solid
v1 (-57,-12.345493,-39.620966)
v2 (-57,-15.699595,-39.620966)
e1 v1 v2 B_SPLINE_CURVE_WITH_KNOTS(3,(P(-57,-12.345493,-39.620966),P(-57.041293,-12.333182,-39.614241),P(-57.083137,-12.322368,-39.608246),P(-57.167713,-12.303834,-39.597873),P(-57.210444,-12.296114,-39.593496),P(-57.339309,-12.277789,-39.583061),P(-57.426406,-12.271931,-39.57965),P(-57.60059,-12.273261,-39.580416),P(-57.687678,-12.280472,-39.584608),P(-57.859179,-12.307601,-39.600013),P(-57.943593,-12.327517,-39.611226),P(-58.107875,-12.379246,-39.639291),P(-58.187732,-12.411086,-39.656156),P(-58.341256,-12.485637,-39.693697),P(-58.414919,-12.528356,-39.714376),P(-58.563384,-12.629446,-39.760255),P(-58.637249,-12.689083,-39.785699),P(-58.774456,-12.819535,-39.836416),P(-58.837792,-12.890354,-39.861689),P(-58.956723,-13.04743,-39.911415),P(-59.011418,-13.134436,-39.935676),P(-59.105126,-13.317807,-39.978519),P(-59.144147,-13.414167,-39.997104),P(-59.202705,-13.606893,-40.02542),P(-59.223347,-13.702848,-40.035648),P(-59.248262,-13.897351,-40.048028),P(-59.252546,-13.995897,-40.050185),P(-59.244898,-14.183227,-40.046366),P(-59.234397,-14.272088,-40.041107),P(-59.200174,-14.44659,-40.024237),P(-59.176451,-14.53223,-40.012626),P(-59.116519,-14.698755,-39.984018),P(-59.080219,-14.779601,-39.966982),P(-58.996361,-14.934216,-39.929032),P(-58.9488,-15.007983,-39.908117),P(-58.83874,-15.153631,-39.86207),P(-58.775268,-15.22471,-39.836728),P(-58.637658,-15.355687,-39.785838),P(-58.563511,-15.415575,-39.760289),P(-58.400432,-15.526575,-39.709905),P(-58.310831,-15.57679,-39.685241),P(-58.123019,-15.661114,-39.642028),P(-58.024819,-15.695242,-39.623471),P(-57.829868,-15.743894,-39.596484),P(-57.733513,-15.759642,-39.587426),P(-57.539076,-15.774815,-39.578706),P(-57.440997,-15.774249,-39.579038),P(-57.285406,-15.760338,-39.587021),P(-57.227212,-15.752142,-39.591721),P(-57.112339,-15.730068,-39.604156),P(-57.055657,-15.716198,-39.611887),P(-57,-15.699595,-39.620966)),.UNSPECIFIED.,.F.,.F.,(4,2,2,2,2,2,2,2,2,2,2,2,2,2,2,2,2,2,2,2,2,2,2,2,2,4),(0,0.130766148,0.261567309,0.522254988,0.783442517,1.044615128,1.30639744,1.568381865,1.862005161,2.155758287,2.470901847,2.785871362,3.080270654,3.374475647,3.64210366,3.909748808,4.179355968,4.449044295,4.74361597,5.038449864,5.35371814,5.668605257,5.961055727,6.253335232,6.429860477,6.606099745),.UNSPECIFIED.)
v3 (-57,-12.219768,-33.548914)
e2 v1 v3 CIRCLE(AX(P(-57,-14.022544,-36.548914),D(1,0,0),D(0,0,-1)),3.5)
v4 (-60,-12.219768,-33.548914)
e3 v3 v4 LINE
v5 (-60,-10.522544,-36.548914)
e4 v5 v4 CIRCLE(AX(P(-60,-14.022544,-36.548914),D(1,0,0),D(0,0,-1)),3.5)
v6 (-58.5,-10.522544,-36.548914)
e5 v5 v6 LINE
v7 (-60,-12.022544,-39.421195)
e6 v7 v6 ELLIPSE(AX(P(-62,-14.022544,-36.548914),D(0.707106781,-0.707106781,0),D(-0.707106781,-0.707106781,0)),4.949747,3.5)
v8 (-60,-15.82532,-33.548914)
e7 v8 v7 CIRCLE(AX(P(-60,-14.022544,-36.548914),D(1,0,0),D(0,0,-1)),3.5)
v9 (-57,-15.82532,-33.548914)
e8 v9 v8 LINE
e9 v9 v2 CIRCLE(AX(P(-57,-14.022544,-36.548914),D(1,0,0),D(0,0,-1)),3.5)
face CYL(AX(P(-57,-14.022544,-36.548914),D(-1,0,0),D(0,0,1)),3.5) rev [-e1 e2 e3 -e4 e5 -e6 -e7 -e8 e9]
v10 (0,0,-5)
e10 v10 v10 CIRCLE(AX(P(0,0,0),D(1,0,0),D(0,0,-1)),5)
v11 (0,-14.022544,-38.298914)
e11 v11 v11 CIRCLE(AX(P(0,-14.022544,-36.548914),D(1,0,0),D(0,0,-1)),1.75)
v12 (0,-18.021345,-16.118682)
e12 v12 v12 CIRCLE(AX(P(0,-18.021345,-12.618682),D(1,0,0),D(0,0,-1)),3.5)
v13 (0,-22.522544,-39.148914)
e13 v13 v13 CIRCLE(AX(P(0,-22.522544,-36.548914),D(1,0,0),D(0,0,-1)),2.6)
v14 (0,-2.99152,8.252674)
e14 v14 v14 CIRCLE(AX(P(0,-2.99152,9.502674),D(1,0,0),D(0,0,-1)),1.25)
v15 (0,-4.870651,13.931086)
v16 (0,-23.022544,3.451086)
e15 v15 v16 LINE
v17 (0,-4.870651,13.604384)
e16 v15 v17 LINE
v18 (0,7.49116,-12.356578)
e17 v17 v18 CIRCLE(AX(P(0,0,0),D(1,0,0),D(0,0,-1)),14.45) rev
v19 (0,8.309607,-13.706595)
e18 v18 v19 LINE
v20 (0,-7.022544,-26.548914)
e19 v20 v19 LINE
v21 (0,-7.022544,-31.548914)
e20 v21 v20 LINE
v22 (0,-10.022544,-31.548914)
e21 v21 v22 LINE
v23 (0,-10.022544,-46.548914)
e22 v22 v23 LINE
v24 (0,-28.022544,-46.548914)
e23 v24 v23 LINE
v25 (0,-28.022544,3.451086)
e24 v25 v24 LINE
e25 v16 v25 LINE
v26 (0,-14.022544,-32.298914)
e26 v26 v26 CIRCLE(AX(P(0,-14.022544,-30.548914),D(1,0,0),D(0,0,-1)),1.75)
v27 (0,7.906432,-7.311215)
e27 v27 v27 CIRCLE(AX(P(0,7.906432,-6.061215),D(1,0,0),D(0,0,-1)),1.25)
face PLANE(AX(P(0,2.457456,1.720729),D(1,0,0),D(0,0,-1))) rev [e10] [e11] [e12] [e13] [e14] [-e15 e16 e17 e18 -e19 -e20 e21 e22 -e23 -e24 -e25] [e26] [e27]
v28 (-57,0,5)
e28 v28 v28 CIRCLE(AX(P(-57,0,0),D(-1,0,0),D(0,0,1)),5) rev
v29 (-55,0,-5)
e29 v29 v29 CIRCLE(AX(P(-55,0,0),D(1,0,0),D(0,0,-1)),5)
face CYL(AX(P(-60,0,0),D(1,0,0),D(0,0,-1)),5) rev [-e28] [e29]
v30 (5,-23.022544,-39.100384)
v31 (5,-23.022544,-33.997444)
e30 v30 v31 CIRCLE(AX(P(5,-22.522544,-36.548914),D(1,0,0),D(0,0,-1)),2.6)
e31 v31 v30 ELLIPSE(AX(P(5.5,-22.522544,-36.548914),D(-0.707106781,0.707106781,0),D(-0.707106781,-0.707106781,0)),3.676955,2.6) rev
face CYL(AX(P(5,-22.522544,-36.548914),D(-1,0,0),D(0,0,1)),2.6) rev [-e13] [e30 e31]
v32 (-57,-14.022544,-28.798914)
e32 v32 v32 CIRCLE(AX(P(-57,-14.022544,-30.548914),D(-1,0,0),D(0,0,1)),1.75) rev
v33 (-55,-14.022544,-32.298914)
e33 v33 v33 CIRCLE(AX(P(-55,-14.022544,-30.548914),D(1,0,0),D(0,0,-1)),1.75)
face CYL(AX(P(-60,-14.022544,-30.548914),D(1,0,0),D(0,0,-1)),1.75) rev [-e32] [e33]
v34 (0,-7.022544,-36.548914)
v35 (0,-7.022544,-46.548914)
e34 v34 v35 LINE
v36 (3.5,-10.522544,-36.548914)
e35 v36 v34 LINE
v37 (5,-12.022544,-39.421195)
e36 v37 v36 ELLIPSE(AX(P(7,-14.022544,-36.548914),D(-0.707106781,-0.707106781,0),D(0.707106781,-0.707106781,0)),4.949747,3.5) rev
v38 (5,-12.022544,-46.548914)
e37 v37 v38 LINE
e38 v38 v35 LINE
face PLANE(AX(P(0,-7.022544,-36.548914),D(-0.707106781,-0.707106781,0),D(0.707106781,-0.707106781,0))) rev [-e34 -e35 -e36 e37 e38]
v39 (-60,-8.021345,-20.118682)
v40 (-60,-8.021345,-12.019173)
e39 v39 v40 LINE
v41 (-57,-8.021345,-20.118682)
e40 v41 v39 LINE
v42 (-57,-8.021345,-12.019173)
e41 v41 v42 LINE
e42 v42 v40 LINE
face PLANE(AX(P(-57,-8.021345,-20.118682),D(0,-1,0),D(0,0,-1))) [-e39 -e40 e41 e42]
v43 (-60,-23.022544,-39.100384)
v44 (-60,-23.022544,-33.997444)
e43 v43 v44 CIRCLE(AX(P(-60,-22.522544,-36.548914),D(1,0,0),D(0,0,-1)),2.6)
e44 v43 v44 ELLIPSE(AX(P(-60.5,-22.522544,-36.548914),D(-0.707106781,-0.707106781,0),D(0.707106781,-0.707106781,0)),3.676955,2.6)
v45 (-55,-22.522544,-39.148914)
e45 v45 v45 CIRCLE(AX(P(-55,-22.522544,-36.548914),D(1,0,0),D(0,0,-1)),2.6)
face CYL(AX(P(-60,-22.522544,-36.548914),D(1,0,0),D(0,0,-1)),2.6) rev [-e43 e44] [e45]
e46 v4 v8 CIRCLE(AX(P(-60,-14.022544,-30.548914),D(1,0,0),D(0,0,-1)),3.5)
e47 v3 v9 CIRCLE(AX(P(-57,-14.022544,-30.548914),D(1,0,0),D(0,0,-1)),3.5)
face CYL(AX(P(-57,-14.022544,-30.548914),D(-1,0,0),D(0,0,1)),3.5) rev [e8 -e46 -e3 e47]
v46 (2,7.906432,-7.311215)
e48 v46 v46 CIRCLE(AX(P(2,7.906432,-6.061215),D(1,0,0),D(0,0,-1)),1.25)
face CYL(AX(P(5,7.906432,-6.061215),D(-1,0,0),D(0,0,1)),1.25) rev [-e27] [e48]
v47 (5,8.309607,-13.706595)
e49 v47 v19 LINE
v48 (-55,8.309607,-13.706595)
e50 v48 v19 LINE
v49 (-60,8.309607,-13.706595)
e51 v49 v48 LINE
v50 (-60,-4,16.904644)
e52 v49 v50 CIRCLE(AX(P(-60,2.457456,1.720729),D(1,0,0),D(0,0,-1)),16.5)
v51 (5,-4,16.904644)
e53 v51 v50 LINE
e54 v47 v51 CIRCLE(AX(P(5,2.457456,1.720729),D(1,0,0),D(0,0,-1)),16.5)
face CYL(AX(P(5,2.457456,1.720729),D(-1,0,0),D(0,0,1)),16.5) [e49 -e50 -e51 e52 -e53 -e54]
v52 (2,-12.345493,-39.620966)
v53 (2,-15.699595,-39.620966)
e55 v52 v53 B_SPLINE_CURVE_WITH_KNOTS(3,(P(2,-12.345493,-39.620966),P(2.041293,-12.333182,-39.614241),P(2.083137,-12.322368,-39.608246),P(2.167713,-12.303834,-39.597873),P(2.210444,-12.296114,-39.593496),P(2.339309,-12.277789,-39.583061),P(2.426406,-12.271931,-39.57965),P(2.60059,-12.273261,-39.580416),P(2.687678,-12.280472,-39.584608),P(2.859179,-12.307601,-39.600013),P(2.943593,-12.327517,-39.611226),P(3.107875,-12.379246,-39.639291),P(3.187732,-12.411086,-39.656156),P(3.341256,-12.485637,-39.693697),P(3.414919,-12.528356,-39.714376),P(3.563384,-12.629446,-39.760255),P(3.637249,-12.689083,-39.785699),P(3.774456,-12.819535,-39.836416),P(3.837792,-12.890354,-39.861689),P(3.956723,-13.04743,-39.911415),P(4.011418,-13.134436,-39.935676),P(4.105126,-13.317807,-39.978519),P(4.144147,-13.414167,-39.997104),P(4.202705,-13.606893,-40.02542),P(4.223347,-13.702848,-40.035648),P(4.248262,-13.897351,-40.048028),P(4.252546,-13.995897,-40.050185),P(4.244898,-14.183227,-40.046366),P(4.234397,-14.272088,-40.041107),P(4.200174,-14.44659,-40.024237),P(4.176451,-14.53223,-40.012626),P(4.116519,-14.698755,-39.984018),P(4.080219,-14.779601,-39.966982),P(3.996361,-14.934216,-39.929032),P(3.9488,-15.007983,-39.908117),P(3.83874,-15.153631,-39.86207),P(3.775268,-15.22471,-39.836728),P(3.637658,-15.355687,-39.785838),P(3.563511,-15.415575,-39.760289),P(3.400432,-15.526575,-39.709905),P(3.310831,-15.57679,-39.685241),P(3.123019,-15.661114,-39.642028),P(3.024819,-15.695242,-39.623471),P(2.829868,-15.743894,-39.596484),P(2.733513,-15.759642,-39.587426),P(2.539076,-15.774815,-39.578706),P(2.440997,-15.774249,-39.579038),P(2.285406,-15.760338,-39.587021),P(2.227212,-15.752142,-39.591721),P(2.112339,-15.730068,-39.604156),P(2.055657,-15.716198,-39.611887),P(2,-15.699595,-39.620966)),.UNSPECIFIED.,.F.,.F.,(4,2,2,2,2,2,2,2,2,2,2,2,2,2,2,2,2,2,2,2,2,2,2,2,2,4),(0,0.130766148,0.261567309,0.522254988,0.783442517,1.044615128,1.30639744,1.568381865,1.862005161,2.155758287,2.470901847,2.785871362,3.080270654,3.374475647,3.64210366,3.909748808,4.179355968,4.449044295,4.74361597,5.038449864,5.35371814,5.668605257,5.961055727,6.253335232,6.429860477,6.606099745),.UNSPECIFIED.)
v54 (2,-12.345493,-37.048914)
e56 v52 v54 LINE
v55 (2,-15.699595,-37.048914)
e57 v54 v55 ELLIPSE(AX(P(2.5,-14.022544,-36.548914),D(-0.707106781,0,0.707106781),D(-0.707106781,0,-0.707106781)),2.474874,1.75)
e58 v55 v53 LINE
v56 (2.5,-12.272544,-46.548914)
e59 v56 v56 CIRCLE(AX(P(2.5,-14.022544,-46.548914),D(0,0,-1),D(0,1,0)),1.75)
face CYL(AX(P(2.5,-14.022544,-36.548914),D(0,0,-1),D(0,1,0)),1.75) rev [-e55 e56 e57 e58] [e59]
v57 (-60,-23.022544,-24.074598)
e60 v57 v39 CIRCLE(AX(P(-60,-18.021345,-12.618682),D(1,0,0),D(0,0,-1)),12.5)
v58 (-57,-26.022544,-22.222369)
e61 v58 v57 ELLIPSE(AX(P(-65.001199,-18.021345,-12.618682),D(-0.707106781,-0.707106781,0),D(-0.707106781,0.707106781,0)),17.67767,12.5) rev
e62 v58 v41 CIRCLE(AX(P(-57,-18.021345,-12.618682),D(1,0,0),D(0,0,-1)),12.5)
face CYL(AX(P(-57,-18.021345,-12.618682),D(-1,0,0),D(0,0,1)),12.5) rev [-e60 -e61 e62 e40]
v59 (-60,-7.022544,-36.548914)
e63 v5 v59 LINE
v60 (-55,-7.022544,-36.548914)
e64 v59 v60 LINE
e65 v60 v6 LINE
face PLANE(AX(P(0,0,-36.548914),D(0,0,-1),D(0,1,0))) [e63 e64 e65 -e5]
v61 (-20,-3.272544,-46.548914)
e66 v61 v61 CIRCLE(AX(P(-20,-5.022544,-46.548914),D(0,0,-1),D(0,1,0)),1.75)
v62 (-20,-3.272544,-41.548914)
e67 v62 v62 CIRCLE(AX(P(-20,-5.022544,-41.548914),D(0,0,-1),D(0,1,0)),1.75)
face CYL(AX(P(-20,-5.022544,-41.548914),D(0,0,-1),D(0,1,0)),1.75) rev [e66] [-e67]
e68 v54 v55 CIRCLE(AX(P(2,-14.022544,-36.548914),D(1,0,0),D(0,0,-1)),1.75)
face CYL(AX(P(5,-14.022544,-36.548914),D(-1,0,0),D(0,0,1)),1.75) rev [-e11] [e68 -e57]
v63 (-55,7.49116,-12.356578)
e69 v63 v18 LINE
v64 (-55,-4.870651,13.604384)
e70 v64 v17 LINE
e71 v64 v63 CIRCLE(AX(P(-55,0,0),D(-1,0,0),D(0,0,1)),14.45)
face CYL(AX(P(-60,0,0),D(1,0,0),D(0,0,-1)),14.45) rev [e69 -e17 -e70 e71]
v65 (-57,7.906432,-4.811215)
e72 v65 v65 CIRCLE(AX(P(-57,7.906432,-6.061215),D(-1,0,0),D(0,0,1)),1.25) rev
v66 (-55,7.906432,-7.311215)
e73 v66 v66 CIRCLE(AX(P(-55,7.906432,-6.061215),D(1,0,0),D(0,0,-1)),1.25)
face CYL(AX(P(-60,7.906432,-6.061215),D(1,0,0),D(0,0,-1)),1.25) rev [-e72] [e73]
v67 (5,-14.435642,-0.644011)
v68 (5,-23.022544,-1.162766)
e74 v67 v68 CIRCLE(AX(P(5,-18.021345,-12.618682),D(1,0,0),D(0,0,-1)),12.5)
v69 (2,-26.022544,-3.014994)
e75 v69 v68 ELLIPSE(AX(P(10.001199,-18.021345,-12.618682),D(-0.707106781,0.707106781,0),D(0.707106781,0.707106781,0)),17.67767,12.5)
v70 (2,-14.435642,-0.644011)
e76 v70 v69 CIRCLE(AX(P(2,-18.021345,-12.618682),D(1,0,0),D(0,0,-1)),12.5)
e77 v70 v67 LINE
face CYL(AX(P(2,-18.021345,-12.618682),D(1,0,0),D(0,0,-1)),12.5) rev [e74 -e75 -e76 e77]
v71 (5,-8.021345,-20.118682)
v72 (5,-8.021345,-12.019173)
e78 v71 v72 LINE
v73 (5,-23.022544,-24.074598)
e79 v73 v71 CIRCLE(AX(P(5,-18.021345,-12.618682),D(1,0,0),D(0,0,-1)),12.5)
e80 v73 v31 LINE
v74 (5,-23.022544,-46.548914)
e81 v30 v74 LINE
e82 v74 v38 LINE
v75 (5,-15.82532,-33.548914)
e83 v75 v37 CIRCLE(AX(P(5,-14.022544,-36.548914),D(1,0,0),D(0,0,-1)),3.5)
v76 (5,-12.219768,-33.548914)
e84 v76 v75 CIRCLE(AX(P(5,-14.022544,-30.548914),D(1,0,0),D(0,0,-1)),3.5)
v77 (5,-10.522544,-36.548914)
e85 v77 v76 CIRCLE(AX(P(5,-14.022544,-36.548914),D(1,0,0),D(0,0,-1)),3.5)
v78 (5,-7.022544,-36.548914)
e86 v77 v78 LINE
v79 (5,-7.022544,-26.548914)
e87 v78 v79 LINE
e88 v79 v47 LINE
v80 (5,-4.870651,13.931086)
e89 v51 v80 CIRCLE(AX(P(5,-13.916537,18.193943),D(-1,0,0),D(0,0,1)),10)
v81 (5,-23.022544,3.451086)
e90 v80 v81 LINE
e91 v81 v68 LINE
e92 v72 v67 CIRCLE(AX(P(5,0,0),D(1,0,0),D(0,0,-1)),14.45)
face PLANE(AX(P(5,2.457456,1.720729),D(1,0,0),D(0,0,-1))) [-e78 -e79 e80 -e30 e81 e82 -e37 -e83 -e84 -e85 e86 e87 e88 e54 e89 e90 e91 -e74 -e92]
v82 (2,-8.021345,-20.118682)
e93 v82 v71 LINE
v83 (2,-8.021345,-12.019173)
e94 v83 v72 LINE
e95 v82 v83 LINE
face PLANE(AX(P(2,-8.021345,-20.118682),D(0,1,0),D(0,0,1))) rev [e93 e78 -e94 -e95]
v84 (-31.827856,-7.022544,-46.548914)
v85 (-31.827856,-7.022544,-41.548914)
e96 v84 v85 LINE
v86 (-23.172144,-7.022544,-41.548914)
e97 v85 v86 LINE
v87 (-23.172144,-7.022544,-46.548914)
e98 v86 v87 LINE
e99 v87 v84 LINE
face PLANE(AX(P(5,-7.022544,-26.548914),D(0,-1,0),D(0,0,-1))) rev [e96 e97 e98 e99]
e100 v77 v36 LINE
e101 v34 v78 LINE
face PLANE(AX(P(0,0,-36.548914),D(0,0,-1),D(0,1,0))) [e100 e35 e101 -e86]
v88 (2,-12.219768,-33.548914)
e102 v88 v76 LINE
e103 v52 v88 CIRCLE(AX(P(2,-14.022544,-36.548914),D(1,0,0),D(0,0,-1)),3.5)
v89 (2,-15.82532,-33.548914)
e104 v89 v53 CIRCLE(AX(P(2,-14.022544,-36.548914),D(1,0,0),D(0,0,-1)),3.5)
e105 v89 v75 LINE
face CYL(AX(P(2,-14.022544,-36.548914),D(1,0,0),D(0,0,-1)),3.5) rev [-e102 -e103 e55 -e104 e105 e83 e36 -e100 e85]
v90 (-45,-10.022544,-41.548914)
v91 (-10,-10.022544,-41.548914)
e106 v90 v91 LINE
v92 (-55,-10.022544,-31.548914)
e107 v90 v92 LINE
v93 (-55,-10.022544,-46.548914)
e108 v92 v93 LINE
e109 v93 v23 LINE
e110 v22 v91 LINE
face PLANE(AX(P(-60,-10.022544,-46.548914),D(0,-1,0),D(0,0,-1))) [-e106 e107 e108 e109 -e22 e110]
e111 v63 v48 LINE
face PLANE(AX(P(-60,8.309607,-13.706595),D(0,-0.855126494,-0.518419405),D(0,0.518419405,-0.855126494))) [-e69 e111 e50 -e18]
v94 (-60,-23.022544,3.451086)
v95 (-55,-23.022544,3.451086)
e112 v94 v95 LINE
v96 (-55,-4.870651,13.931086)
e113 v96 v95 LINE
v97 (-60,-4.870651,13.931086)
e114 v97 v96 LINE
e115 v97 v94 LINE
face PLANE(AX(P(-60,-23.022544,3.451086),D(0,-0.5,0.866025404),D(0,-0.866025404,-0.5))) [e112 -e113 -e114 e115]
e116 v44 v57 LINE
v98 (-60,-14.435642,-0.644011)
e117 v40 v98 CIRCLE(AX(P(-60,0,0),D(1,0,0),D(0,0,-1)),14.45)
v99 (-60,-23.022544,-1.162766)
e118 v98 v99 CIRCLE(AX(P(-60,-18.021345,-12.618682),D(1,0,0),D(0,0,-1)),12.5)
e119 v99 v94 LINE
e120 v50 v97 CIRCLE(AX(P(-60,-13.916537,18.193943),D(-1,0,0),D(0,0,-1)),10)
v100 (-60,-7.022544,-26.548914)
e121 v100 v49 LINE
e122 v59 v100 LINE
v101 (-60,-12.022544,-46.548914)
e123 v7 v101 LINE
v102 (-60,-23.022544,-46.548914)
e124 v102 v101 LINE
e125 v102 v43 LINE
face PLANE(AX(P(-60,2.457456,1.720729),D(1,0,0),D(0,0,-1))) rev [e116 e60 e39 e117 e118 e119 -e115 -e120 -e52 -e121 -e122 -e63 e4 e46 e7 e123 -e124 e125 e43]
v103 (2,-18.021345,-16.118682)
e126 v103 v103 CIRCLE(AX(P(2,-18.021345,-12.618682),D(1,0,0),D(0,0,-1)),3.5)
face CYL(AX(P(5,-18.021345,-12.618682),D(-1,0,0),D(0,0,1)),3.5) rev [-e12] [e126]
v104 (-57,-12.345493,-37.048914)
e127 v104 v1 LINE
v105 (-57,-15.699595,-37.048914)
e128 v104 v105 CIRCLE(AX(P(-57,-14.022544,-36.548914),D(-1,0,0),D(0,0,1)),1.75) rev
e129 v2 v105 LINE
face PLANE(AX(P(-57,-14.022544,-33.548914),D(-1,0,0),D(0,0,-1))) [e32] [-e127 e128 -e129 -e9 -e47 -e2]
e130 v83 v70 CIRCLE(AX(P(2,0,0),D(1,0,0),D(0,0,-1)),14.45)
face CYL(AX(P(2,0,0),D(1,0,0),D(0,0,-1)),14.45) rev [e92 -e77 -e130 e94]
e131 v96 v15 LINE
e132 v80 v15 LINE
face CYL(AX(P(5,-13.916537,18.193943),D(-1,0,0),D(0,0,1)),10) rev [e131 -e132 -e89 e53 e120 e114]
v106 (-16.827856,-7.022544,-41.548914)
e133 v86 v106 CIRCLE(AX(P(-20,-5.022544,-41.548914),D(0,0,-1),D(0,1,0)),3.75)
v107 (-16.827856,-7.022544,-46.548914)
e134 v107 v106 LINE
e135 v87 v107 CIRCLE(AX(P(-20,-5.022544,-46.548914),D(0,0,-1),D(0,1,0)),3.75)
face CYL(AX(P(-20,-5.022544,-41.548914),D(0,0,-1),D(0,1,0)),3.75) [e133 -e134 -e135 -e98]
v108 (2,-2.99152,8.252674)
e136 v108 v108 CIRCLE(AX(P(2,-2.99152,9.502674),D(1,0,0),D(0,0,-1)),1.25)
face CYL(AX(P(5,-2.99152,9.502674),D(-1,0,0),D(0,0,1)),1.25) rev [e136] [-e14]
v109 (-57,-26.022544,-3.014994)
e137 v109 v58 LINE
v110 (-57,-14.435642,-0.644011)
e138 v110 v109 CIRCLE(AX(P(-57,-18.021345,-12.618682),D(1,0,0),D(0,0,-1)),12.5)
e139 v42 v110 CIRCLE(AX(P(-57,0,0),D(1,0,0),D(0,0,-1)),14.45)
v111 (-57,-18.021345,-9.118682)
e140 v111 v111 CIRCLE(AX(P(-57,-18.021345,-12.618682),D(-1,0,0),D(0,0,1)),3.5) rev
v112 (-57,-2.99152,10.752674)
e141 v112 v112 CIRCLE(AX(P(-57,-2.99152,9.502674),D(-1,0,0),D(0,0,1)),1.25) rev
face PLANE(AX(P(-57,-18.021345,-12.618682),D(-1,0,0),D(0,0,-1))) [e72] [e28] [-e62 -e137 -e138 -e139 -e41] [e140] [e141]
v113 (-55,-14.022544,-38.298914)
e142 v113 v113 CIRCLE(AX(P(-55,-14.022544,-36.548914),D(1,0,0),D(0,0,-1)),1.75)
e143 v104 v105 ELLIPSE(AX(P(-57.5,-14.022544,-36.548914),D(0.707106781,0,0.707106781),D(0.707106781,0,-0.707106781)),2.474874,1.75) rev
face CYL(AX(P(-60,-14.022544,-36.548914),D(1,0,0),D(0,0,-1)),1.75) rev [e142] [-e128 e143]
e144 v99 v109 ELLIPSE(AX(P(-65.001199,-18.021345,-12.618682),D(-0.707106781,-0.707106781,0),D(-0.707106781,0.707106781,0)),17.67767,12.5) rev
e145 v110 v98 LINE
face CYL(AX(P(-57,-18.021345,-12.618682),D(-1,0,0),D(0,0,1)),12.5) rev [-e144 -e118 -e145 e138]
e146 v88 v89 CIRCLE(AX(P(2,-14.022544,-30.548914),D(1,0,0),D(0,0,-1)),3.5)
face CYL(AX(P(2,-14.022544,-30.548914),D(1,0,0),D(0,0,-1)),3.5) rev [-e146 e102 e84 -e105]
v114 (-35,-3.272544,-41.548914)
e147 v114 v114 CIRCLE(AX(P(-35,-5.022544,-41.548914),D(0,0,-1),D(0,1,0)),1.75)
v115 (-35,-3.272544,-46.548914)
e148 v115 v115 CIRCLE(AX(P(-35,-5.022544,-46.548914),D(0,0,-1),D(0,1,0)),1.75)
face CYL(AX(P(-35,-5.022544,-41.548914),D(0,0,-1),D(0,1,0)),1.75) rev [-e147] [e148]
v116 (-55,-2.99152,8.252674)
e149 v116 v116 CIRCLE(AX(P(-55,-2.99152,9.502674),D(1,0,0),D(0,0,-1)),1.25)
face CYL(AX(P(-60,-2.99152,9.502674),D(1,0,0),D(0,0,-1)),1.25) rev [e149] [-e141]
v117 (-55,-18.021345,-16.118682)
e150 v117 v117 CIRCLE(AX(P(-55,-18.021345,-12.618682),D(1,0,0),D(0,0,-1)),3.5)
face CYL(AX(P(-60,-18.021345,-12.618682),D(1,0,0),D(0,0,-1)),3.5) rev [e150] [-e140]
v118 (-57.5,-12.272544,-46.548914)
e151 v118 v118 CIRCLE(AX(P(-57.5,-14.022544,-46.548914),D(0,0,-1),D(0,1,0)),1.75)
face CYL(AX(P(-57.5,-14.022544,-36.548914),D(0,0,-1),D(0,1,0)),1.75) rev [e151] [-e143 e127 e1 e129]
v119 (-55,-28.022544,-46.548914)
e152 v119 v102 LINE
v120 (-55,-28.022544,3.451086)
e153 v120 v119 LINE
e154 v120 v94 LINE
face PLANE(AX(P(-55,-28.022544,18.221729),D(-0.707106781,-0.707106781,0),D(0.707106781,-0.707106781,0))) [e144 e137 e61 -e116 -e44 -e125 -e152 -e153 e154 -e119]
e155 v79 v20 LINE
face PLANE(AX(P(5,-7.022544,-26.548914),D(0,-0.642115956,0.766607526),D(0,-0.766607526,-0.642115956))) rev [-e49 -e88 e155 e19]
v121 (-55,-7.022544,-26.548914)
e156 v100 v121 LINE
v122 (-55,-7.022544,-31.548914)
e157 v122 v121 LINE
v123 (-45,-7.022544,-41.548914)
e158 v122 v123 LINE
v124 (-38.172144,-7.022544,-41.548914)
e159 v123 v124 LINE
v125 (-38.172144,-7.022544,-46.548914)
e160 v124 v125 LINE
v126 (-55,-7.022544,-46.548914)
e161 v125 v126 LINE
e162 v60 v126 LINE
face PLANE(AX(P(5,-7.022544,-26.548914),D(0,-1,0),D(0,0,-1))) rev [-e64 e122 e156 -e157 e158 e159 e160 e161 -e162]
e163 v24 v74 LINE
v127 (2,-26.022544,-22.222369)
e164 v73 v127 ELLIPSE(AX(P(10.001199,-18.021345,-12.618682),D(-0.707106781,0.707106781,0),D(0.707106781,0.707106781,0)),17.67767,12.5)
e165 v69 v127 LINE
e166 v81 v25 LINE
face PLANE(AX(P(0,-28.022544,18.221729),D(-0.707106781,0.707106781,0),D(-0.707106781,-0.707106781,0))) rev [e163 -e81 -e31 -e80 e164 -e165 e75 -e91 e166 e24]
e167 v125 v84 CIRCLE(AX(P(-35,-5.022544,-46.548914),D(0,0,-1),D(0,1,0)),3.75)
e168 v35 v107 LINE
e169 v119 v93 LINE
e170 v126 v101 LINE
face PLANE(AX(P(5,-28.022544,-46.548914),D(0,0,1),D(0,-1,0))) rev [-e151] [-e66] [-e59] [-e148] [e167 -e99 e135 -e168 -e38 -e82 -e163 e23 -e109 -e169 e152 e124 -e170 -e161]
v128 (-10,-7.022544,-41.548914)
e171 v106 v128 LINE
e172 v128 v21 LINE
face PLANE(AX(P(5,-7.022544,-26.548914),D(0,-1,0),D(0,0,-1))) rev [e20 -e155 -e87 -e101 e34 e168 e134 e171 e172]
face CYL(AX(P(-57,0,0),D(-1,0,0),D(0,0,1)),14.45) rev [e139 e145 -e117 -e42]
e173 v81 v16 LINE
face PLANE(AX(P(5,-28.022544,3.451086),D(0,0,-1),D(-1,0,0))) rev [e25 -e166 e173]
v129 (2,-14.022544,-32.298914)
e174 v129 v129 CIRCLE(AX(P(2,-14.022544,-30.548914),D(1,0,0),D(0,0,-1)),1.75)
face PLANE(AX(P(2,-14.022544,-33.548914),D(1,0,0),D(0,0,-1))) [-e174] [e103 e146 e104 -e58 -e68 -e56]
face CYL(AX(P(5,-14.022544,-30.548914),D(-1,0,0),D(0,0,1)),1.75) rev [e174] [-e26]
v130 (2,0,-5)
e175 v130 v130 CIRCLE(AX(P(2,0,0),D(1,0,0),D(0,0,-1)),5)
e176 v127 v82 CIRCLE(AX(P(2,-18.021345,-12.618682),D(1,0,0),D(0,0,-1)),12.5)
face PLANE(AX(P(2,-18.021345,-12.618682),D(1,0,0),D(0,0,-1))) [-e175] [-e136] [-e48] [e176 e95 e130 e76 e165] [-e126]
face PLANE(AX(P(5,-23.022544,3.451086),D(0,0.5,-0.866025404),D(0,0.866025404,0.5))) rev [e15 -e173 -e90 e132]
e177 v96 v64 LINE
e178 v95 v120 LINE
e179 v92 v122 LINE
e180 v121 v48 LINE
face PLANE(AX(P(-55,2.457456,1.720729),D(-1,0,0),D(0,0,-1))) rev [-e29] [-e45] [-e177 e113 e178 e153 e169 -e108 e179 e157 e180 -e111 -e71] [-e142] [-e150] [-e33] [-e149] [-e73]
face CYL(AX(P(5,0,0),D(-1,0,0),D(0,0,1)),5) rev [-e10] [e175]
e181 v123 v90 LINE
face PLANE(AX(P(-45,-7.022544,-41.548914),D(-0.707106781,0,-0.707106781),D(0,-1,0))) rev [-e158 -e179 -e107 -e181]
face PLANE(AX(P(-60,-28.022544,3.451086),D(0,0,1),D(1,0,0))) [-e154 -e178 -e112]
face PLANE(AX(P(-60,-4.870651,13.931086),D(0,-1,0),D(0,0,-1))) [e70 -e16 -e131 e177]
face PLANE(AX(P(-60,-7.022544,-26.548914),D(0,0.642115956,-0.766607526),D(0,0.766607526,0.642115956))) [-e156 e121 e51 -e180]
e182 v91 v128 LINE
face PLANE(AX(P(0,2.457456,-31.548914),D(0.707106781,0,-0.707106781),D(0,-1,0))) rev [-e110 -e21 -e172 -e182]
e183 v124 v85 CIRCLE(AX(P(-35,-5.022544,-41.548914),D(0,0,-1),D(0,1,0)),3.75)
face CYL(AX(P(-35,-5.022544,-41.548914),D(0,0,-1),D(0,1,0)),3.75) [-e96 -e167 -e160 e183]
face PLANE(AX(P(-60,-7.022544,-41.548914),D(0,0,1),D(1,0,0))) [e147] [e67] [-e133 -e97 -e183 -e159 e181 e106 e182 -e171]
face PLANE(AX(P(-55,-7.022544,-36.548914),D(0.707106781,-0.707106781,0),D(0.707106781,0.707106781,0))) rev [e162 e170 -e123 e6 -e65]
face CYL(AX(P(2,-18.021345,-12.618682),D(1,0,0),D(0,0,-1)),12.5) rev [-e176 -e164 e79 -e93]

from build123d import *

# Parameters (mm, degrees)
SKETCH1_R           = 5
SKETCH1_R_2         = 1.25
SKETCH1_R_3         = 3.5
SKETCH1_R_4         = 1.75
SKETCH1_R_5         = 2.6
BOSS_EXTRUDE1_DEPTH = 5
CUT_EXTRUDE12_DEPTH = 3
CUT_EXTRUDE15_REACH = 72.749
BOSS_EXTRUDE2_START = -65
SKETCH7_W           = 5
SKETCH7_H           = 3
BOSS_EXTRUDE2_DEPTH = 65
SKETCH8_R           = 1.75
CUT_EXTRUDE16_DEPTH = 10
SKETCH10_R          = 3.75
SKETCH10_R_2        = 1.75
BOSS_EXTRUDE3_DEPTH = 5
CHAMFER1_SIZE       = 10


with BuildPart() as part:
    # Sketch1 → Boss-Extrude1 (new body)
    with BuildSketch(Plane(origin=(0, 0, 0), x_dir=(0, 0, -1), z_dir=(1, 0, 0))):
        with BuildLine():
            Line((-3.451085907, -28.022543867), (46.548914093, -28.022543867))
            Line((46.548914093, -28.022543867), (46.548914093, -7.022543867))
            Line((46.548914093, -7.022543867), (26.548914093, -7.022543867))
            Line((26.548914093, -7.022543867), (13.706594967, 8.30960665))
            ThreePointArc((13.706594967, 8.30960665), (-7.876735811, 17.766067564), (-16.904643834, -4))
            ThreePointArc((-16.904643834, -4), (-15.383939757, -4.319460395), (-13.931085907, -4.870651404))
            Line((-13.931085907, -4.870651404), (-3.451085907, -23.022543867))
            Line((-3.451085907, -23.022543867), (-3.451085907, -28.022543867))
        make_face()
        Circle(SKETCH1_R, mode=Mode.SUBTRACT)
        with Locations((6.061215112, 7.906432278)):
            Circle(SKETCH1_R_2, mode=Mode.SUBTRACT)
        with Locations((-9.50267373, -2.991520012)):
            Circle(SKETCH1_R_2, mode=Mode.SUBTRACT)
        with Locations((12.6186816, -18.021344974)):
            Circle(SKETCH1_R_3, mode=Mode.SUBTRACT)
        with Locations((36.548914093, -14.022543867)):
            Circle(SKETCH1_R_4, mode=Mode.SUBTRACT)
        with Locations((30.548914093, -14.022543867)):
            Circle(SKETCH1_R_4, mode=Mode.SUBTRACT)
        with Locations((36.548914093, -22.522543867)):
            Circle(SKETCH1_R_5, mode=Mode.SUBTRACT)
    boss_extrude1 = extrude(amount=BOSS_EXTRUDE1_DEPTH)

    # Sketch2 → Cut-Extrude12 (cut)
    with BuildSketch(Plane(origin=(5, 0, 0), x_dir=(0, 0, -1), z_dir=(1, 0, 0))):
        with BuildLine():
            Line((9.1186816, -30.021344974), (16.1186816, -30.021344974))
            ThreePointArc((16.1186816, -30.021344974), (24.917055476, -20.257412952), (20.1186816, -8.021344974))
            Line((20.1186816, -8.021344974), (12.019173216, -8.021344974))
            ThreePointArc((12.019173216, -8.021344974), (-7.097524936, 12.586804193), (0.644011182, -14.435641641))
            ThreePointArc((0.644011182, -14.435641641), (1.637110982, -23.992534703), (9.1186816, -30.021344974))
        make_face()
        with BuildLine():
            ThreePointArc((33.548914093, -15.825319505), (40.048914093, -14.022543867), (33.548914093, -12.219768229))
            ThreePointArc((33.548914093, -12.219768229), (27.048914093, -14.022543867), (33.548914093, -15.825319505))
        make_face()
    cut_extrude12 = extrude(amount=-CUT_EXTRUDE12_DEPTH, mode=Mode.SUBTRACT)

    # Sketch6 → Cut-Extrude15 (cut, up to next)
    with BuildSketch(Plane(origin=(0, 0, -46.548914093), x_dir=(-1, 0, 0), z_dir=(0, 0, -1)), mode=Mode.PRIVATE) as cut_extrude15_sk1:
        Polygon((0, -28.022543867), (-5, -23.022543867), (-6.777242855, -29.799786723), align=None)
    cut_extrude15_tool1 = extrude(cut_extrude15_sk1.sketch, amount=-CUT_EXTRUDE15_REACH, mode=Mode.PRIVATE) & part.part
    cut_extrude15 = cut_extrude15_tool1.solids().sort_by_distance((3.925748, -26.948291, -46.548914))[0]
    add(cut_extrude15, mode=Mode.SUBTRACT)

    # Sketch7 → Boss-Extrude2 (add)
    with BuildSketch(Plane(origin=(5, 0, 0), x_dir=(0, 0, -1), z_dir=(1, 0, 0)).offset(BOSS_EXTRUDE2_START)):
        with BuildLine():
            Line((-13.931085907, -4.870651404), (-13.604383665, -4.870651404))
            ThreePointArc((-13.604383665, -4.870651404), (-6.212314592, 13.046441944), (12.35657784, 7.491160397))
            Line((12.35657784, 7.491160397), (13.706594967, 8.30960665))
            ThreePointArc((13.706594967, 8.30960665), (-7.876735811, 17.766067564), (-16.904643834, -4))
            ThreePointArc((-16.904643834, -4), (-15.383939757, -4.319460395), (-13.931085907, -4.870651404))
        make_face()
        with Locations((44.048914093, -8.522543867)):
            Rectangle(SKETCH7_W, SKETCH7_H)
    extrude(amount=BOSS_EXTRUDE2_DEPTH)

    # Mirror4: Boss-Extrude1, Cut-Extrude12, Cut-Extrude15 across plane
    add(boss_extrude1.mirror(Plane(origin=(-27.5, 0, 0), x_dir=(0, 0, 1), z_dir=(1, 0, 0))))
    add(cut_extrude12.mirror(Plane(origin=(-27.5, 0, 0), x_dir=(0, 0, 1), z_dir=(1, 0, 0))), mode=Mode.SUBTRACT)
    add(cut_extrude15.mirror(Plane(origin=(-27.5, 0, 0), x_dir=(0, 0, 1), z_dir=(1, 0, 0))), mode=Mode.SUBTRACT)

    # Sketch8 → Cut-Extrude16 (cut)
    with BuildSketch(Plane(origin=(0, 0, -46.548914093), x_dir=(-1, 0, 0), z_dir=(0, 0, -1))):
        with Locations(Location((-2.5, -14.022543867, 0), (0, 0, 90))):
            Circle(SKETCH8_R)
        with Locations(Location((57.5, -14.022543867, 0), (0, 0, 90))):
            Circle(SKETCH8_R)
        Polygon((55, -7.022543867), (60, -12.022543867), (62.67758006, -4.344963807), align=None)
        Polygon((0, -7.022543867), (-5, -12.022543867), (-6.777064695, -5.245479172), align=None)
    extrude(amount=-CUT_EXTRUDE16_DEPTH, mode=Mode.SUBTRACT)

    # Sketch10 → Boss-Extrude3 (add)
    # profile 1 of 2: a face of its own
    with BuildSketch(Plane(origin=(0, 0, -46.548914093), x_dir=(-1, 0, 0), z_dir=(0, 0, -1))):
        with Locations((35, -5.022543867)):
            Circle(SKETCH10_R)
        with Locations(Location((35, -5.022543867, 0), (0, 0, 90))):
            Circle(SKETCH10_R_2, mode=Mode.SUBTRACT)
    # profile 2 of 2: a face of its own
    with BuildSketch(Plane(origin=(0, 0, -46.548914093), x_dir=(-1, 0, 0), z_dir=(0, 0, -1))):
        with Locations((20, -5.022543867)):
            Circle(SKETCH10_R)
        with Locations(Location((20, -5.022543867, 0), (0, 0, 90))):
            Circle(SKETCH10_R_2, mode=Mode.SUBTRACT)
    extrude(amount=-BOSS_EXTRUDE3_DEPTH)

    # Chamfer1
    # the kernel refuses this chamfer: 10 mm, written as the material it adds along each edge
    with BuildSketch(Plane(origin=(0, -10.022543867, -41.548914093), x_dir=(-0.9996219169112968, 0, -0.027495876610586317), z_dir=(0, 1, 0)), Plane(origin=(-55, -7.022543867, -41.548914093), x_dir=(0.9996219169112968, 0, -0.027495876610586317), z_dir=(0, -1, 0))) as chamfer1_piece_1:
        Polygon((CHAMFER1_SIZE * 0.999621916911, CHAMFER1_SIZE * 0.0274958766106), (-CHAMFER1_SIZE * 0.0274958766106, CHAMFER1_SIZE * 0.999621916911), (0, 0), align=None)
    extrude(amount=3)


solid = part.part
